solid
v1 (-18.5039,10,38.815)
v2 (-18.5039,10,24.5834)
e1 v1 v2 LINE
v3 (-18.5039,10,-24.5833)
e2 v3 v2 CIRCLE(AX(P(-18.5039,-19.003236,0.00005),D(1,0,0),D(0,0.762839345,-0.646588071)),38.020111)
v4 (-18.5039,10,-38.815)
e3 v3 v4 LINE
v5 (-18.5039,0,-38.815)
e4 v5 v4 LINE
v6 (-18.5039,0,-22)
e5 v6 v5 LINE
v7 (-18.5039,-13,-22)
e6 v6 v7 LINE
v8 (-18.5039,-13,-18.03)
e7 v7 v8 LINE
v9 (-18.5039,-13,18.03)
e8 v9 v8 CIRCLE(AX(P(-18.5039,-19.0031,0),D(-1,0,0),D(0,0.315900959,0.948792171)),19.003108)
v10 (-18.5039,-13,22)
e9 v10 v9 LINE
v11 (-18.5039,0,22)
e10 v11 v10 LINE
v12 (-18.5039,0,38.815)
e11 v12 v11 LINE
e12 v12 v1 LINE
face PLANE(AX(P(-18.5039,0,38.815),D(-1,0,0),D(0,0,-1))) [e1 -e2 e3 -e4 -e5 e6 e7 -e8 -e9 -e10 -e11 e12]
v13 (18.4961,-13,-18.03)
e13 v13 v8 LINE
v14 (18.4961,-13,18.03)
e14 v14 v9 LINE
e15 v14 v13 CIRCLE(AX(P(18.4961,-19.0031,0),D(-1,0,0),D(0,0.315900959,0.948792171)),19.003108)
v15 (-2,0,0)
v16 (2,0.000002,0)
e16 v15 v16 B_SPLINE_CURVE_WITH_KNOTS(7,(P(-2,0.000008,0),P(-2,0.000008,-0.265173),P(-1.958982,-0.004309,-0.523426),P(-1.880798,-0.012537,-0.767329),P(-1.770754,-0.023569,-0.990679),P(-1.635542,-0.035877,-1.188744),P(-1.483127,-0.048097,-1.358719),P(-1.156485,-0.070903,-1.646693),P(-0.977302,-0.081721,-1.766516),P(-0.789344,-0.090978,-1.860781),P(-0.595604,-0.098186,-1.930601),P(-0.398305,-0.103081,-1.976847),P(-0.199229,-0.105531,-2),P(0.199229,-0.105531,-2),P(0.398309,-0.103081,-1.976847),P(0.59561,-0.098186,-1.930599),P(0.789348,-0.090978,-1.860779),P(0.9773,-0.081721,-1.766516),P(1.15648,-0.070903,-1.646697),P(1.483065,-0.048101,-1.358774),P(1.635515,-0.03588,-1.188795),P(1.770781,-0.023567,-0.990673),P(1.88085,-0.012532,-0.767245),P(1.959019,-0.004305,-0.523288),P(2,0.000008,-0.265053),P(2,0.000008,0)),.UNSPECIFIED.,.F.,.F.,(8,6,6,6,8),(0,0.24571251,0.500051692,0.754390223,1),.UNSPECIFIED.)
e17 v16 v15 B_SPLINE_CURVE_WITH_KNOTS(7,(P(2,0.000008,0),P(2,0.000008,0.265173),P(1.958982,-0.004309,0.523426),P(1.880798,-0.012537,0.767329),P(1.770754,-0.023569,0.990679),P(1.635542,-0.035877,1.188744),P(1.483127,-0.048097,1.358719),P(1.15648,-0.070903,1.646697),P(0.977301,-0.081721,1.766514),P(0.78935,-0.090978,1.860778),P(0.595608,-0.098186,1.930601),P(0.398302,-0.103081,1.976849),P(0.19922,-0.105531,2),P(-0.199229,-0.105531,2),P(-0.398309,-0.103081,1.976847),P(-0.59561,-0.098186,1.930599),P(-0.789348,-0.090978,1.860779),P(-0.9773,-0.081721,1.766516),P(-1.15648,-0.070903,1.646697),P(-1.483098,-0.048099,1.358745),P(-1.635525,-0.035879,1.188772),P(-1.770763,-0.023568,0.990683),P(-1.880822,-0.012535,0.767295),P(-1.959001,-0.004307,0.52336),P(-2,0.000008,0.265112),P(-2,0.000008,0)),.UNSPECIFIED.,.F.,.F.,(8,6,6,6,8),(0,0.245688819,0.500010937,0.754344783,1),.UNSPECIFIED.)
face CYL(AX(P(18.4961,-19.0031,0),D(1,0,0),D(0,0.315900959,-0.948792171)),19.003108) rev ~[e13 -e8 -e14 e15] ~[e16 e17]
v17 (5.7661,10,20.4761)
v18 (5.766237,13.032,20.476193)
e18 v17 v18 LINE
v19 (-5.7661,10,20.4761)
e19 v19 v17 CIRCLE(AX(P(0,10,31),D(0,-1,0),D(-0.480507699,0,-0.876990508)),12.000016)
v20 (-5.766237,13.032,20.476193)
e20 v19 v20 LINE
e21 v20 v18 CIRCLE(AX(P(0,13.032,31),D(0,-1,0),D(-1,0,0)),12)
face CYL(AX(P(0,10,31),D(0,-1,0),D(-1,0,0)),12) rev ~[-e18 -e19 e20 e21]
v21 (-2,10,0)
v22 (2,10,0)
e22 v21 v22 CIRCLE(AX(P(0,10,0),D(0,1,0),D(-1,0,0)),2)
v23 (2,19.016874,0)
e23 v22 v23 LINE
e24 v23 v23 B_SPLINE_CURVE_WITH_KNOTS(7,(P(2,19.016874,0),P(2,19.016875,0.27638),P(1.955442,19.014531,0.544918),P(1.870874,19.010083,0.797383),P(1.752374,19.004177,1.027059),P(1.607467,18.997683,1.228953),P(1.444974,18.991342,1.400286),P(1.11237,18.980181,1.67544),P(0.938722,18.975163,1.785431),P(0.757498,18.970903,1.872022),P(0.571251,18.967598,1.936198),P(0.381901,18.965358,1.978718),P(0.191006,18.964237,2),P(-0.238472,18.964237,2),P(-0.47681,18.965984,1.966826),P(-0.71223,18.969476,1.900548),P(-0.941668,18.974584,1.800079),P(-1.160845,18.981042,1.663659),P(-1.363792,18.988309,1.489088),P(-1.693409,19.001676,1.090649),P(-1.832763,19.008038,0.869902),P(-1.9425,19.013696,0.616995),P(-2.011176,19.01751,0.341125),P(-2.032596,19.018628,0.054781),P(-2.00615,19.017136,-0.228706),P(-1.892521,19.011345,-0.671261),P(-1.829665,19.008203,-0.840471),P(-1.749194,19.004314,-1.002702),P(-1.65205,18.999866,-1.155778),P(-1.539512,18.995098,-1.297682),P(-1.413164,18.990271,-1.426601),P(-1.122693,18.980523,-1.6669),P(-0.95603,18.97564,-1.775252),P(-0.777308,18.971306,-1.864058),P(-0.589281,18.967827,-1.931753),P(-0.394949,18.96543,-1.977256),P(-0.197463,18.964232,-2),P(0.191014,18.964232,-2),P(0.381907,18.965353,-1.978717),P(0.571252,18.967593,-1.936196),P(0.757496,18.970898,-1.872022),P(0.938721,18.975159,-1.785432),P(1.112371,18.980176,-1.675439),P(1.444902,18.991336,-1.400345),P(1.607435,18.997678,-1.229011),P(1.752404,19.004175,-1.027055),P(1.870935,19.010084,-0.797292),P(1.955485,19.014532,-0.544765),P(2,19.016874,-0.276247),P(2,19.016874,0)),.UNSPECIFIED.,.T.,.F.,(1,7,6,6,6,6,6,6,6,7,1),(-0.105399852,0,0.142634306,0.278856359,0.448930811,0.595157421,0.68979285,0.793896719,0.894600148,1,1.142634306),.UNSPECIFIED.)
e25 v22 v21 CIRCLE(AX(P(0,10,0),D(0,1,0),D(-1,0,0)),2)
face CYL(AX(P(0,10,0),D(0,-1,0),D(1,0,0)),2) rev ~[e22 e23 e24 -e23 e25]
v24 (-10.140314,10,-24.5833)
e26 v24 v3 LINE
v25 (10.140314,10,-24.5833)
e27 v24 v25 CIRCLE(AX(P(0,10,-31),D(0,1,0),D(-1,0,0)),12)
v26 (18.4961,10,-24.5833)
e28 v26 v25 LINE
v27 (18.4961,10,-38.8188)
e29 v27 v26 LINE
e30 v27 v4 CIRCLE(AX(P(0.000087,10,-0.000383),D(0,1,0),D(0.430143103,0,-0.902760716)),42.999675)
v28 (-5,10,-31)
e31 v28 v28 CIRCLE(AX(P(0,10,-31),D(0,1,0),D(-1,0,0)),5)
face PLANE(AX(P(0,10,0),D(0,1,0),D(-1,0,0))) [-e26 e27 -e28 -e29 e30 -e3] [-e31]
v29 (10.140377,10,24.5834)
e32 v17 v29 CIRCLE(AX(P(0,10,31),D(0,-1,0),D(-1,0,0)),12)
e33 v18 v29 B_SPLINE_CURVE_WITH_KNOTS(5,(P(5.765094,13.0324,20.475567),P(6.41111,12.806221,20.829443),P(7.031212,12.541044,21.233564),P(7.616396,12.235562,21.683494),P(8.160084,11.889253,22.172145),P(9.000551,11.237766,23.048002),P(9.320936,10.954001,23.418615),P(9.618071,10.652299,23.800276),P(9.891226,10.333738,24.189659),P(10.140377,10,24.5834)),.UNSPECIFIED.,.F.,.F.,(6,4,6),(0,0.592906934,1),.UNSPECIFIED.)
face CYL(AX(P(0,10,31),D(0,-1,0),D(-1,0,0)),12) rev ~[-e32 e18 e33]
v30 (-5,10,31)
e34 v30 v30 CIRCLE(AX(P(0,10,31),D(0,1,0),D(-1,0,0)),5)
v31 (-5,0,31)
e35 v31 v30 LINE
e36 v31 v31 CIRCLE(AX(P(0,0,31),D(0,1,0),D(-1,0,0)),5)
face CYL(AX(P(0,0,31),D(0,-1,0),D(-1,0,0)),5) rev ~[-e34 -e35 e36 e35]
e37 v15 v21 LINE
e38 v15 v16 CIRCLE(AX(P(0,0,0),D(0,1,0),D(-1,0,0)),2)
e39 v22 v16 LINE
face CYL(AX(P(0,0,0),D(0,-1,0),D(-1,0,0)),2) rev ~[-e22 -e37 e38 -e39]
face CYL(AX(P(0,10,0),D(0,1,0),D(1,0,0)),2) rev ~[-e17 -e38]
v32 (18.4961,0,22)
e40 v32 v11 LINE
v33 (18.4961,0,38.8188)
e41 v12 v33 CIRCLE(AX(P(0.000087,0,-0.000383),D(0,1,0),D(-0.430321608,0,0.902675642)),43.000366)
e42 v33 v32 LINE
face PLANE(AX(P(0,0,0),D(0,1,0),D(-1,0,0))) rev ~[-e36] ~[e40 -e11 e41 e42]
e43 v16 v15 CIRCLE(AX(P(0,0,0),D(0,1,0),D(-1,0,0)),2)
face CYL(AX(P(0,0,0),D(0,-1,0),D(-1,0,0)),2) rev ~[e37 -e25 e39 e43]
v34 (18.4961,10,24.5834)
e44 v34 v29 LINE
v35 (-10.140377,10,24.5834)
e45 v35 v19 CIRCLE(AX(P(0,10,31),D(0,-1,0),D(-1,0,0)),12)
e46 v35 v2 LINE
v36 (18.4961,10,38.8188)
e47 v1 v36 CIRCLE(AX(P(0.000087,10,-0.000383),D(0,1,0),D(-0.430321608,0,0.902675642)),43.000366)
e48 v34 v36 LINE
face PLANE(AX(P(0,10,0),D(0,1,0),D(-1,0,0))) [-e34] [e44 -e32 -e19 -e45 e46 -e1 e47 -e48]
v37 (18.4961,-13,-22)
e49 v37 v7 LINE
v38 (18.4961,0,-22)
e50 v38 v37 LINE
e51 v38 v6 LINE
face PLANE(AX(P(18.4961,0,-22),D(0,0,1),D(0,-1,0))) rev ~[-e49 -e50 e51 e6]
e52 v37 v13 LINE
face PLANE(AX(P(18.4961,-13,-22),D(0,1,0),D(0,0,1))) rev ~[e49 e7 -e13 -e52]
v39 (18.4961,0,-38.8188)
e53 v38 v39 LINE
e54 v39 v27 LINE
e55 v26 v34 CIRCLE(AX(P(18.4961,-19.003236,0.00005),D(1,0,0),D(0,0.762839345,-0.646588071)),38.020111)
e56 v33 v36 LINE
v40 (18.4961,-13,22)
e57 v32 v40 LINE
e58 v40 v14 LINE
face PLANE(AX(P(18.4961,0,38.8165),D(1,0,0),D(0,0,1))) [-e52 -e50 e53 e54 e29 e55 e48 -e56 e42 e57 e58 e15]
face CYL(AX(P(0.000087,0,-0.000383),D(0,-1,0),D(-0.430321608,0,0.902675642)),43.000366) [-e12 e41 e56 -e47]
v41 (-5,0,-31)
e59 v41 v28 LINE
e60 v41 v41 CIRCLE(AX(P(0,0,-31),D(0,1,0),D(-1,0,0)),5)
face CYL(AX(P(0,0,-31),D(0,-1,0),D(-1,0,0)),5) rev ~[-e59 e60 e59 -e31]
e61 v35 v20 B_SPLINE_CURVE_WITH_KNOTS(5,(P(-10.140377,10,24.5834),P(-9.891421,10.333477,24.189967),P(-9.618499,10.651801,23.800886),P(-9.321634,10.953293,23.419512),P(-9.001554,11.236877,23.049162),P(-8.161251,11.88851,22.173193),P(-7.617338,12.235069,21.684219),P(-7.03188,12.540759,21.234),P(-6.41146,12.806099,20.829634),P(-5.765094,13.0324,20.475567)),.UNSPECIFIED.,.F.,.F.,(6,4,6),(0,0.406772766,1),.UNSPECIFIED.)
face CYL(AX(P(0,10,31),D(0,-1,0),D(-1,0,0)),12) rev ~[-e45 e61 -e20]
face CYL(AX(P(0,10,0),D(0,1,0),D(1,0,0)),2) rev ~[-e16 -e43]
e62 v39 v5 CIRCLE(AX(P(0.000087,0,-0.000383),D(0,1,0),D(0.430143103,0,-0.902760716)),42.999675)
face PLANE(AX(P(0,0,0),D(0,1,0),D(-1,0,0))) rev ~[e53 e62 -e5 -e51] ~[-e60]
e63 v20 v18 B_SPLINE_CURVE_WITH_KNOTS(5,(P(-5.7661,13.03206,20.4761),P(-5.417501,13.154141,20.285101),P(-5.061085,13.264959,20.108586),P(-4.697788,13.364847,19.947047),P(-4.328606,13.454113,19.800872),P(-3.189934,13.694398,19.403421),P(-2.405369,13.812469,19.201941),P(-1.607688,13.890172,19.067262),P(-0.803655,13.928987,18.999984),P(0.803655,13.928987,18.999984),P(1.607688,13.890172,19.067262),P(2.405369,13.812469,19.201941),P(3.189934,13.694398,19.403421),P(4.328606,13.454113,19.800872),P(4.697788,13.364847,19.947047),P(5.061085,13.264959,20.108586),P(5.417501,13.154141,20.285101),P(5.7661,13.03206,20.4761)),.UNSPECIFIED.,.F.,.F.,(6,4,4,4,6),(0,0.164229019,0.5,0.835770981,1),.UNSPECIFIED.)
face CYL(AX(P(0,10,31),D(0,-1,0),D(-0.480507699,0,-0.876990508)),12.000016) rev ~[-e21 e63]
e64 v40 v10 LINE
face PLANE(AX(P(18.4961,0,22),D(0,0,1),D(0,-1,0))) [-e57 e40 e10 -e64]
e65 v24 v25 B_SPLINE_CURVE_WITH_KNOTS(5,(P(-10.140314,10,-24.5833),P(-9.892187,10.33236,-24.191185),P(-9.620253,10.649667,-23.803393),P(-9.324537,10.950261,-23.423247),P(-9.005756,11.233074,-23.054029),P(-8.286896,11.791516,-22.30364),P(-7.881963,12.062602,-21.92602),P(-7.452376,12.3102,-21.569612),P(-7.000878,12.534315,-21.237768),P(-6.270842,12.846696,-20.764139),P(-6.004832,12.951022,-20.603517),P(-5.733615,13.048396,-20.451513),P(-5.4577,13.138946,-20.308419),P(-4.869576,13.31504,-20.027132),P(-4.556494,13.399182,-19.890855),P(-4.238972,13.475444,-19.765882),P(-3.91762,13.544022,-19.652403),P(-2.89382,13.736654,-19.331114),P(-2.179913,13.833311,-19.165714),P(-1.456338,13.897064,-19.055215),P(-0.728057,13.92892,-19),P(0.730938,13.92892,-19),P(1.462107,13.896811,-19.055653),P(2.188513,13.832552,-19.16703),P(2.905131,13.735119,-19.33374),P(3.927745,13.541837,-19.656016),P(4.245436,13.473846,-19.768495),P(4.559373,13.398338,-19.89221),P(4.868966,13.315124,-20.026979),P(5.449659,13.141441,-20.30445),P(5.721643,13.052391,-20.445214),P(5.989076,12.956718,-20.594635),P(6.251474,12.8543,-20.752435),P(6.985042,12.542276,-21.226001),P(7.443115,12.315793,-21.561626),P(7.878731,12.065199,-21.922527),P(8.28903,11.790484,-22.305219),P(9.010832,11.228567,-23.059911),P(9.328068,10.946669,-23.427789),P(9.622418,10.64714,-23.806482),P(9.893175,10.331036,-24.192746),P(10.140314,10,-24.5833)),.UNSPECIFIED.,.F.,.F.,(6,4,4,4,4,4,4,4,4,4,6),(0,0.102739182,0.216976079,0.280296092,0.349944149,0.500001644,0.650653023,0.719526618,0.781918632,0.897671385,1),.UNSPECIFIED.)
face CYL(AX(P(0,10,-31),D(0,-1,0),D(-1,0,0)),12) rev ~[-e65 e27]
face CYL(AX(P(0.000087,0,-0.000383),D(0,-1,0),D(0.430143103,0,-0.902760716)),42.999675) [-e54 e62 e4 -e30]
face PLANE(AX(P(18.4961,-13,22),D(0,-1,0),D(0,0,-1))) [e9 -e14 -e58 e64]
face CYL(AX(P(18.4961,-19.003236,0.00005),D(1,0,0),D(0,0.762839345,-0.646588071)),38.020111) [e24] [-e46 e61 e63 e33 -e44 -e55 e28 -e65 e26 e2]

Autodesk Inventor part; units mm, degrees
ref_plane "YZ Plane" through (0, 0, 0) normal (1, 0, 0) x (0, 1, 0)
ref_plane "XZ Plane" through (0, 0, 0) normal (0, 1, 0) x (-1, 0, 0)
ref_plane "XY Plane" through (0, 0, 0) normal (0, 0, 1) x (1, 0, 0)
sketch "Sketch1" plane through (0, 0, 0) normal (0, 1, 0) x (-1, 0, 0)
  circle A0 centre (0, 0) radius 2
  line L0 (-18.4961, 38.8165) -> (-18.4961, -38.8135)
  line L1 (18.4961, 38.8135) -> (-18.4961, -38.8135) construction
  line L2 (-18.4961, 38.8165) -> (18.4961, -38.8165) construction
  circle A1 centre (0, 31) radius 5
  circle A2 centre (0, -31) radius 5
  arc A3 (18.5039, 38.815) -> (-18.4961, 38.8188) centre (0, 0) ccw
  arc A4 (-18.4961, -38.8188) -> (18.5039, -38.815) centre (0, 0) ccw
  line L3 (18.5039, 38.815) -> (18.5039, -38.815)
  line L4 (-18.4961, -38.8135) -> (-18.4961, -38.8188)
  line L5 (-18.4961, 38.8165) -> (-18.4961, 38.8188)
  dimension "d0" = 2
  dimension "d4" = 10
  dimension "d5" = 10
  dimension "d6" = 31
  dimension "d7" = 31
  dimension "d8" = 77.63
  dimension "d9" = 37
  dimension "d10" = 43
  dimension "d11" = 43
  dimension "d12" = 77.63
extrude "Extrusion1" add sketch "Sketch1" along normal blind 10
sketch "Sketch2" plane through (18.4961, 0, 38.8188) normal (1, 0, 0) x (0, 0, -1)
  line L0 (0, 0) -> (77.6375, 0) projected
  line L1 (0, 10) -> (77.6375, 10) projected
  line L2 (0.0038, 0) -> (-4.1812, 0) projected
  line L3 (-4.1812, 0) -> (16.8188, 0)
  line L4 (16.8188, 0) -> (16.8188, -13)
  line L5 (16.8188, -13) -> (20.7888, -13)
  line L6 (81.8188, 0) -> (77.6338, 0) projected
  line L7 (81.8188, 0) -> (60.8188, 0)
  line L8 (60.8188, 0) -> (60.8188, -13)
  line L9 (60.8188, -13) -> (56.8488, -13)
  arc A0 (56.8488, -13) -> (20.7888, -13) centre (38.8188, -19.0031) ccw
  arc A1 (63.4021, 10) -> (14.2354, 10) centre (38.8188, -19.0031) ccw
  line L10 (36.8188, 10) -> (40.8188, 10) projected
  point P0 (38.8188, 0)
  point P1 (38.8188, 19.0169)
  dimension "d15" = 21
  dimension "d16" = 13
  dimension "d17" = 3.97
  dimension "d18" = 21
  dimension "d19" = 13
  dimension "d20" = 3.97
  dimension "d22" = 38.02
extrude "Extrusion2" add sketch "Sketch2" against normal blind 37
sketch "Sketch3" plane through (0, 10, 0) normal (0, -1, 0) x (1, 0, 0)
  circle A0 centre (0, 0) radius 2 projected
extrude "Extrusion3" cut sketch "Sketch3" along normal through all both and the other way through all
sketch "Sketch4" plane through (0, 0, 0) normal (0, -1, 0) x (1, 0, 0)
  circle A0 centre (0, 31) radius 5 projected
  arc A1 (-12, 31) -> (12, 31) centre (0, 31) ccw
  circle A2 centre (0, 31) radius 10.5 projected
  arc A3 (-10.5, 31) -> (10.5, 31) centre (0, 31) ccw
  line L0 (12, 31) -> (-12, 31)
  point P0 (10.5, 31)
  dimension "d27" = 12
extrude "Extrusion4" cut sketch "Sketch4" against normal blind 3.032 from surface at -10 contours L0 A1 A2
sketch "Sketch5" plane through (0, 10, 0) normal (0, 1, 0) x (1, 0, 0)
  line L0 (-18.5039, 24.5833) -> (18.4961, 24.5833) projected
  circle A0 centre (0, 31) radius 5 projected
  circle A1 centre (0, 31) radius 10.5 projected
  arc A2 (-12, 31) -> (12, 31) centre (0, 31) ccw
  arc A3 (-10.5, 31) -> (10.5, 31) centre (0, 31) ccw
  line L1 (12, 31) -> (-12, 31)
  point P0 (8.3112, 24.5833)
  point P1 (-8.3112, 24.5833)
  dimension "d30" = 12
extrude "Extrusion5" cut sketch "Sketch5" along normal through all contours A2 L1 A1 L0 | L0 A1 A2 | L0 A1 | L0 A1 L1 A2
sketch "Sketch6" plane through (0, 13.032, 31) normal (0, -1, 0) x (1, 0, 0)
  arc A0 (-5.7661, -10.5239) -> (5.7661, -10.5239) centre (0, 0) ccw projected
  line L0 (-5.7661, -10.5239) -> (5.7661, -10.5239) projected
  spline S0 degree 6 poles (8.3112, -6.4167) (8.1303, -6.651) (7.9395, -6.8817) (7.739, -7.108) (7.5289, -7.3291) (7.3096, -7.5442) (6.6527, -8.1442) (6.1935, -8.5115) (5.7064, -8.85) (5.1948, -9.156) (4.663, -9.4266) (3.9079, -9.7483) (3.6976, -9.8316) (3.4851, -9.9094) (3.2708, -9.9817) (3.0547, -10.0484) (2.3754, -10.239) (1.9069, -10.3432) (1.4335, -10.4215) (0.9567, -10.4739) (0.4783, -10.5) (-0.4841, -10.5) (-0.9683, -10.4732) (-1.4508, -10.4196) (-1.9299, -10.3394) (-2.4038, -10.2327) (-3.0854, -10.0389) (-3.2986, -9.9724) (-3.5101, -9.9004) (-3.7198, -9.8231) (-3.9273, -9.7404) (-4.6765, -9.4197) (-5.2053, -9.1498) (-5.7139, -8.8448) (-6.1983, -8.5077) (-6.655, -8.1422) (-7.3097, -7.5441) (-7.529, -7.3291) (-7.739, -7.108) (-7.9396, -6.8817) (-8.1303, -6.6509) (-8.3112, -6.4167) knots 0 0 0 0 0 0 0 0.097765 0.097765 0.097765 0.097765 0.097765 0.281656 0.281656 0.281656 0.281656 0.281656 0.351588 0.351588 0.351588 0.351588 0.351588 0.499999 0.499999 0.499999 0.499999 0.499999 0.65021 0.65021 0.65021 0.65021 0.65021 0.719277 0.719277 0.719277 0.719277 0.719277 0.902242 0.902242 0.902242 0.902242 0.902242 1 1 1 1 1 1 1 projected
  line L1 (8.3112, -6.4167) -> (-8.3112, -6.4167) projected
  point P0 (0, -31)
extrude "Extrusion6" cut sketch "Sketch6" against normal blind 10 from surface at 3.032
properties part number "cap" material "Brass, Soft Yellow"
